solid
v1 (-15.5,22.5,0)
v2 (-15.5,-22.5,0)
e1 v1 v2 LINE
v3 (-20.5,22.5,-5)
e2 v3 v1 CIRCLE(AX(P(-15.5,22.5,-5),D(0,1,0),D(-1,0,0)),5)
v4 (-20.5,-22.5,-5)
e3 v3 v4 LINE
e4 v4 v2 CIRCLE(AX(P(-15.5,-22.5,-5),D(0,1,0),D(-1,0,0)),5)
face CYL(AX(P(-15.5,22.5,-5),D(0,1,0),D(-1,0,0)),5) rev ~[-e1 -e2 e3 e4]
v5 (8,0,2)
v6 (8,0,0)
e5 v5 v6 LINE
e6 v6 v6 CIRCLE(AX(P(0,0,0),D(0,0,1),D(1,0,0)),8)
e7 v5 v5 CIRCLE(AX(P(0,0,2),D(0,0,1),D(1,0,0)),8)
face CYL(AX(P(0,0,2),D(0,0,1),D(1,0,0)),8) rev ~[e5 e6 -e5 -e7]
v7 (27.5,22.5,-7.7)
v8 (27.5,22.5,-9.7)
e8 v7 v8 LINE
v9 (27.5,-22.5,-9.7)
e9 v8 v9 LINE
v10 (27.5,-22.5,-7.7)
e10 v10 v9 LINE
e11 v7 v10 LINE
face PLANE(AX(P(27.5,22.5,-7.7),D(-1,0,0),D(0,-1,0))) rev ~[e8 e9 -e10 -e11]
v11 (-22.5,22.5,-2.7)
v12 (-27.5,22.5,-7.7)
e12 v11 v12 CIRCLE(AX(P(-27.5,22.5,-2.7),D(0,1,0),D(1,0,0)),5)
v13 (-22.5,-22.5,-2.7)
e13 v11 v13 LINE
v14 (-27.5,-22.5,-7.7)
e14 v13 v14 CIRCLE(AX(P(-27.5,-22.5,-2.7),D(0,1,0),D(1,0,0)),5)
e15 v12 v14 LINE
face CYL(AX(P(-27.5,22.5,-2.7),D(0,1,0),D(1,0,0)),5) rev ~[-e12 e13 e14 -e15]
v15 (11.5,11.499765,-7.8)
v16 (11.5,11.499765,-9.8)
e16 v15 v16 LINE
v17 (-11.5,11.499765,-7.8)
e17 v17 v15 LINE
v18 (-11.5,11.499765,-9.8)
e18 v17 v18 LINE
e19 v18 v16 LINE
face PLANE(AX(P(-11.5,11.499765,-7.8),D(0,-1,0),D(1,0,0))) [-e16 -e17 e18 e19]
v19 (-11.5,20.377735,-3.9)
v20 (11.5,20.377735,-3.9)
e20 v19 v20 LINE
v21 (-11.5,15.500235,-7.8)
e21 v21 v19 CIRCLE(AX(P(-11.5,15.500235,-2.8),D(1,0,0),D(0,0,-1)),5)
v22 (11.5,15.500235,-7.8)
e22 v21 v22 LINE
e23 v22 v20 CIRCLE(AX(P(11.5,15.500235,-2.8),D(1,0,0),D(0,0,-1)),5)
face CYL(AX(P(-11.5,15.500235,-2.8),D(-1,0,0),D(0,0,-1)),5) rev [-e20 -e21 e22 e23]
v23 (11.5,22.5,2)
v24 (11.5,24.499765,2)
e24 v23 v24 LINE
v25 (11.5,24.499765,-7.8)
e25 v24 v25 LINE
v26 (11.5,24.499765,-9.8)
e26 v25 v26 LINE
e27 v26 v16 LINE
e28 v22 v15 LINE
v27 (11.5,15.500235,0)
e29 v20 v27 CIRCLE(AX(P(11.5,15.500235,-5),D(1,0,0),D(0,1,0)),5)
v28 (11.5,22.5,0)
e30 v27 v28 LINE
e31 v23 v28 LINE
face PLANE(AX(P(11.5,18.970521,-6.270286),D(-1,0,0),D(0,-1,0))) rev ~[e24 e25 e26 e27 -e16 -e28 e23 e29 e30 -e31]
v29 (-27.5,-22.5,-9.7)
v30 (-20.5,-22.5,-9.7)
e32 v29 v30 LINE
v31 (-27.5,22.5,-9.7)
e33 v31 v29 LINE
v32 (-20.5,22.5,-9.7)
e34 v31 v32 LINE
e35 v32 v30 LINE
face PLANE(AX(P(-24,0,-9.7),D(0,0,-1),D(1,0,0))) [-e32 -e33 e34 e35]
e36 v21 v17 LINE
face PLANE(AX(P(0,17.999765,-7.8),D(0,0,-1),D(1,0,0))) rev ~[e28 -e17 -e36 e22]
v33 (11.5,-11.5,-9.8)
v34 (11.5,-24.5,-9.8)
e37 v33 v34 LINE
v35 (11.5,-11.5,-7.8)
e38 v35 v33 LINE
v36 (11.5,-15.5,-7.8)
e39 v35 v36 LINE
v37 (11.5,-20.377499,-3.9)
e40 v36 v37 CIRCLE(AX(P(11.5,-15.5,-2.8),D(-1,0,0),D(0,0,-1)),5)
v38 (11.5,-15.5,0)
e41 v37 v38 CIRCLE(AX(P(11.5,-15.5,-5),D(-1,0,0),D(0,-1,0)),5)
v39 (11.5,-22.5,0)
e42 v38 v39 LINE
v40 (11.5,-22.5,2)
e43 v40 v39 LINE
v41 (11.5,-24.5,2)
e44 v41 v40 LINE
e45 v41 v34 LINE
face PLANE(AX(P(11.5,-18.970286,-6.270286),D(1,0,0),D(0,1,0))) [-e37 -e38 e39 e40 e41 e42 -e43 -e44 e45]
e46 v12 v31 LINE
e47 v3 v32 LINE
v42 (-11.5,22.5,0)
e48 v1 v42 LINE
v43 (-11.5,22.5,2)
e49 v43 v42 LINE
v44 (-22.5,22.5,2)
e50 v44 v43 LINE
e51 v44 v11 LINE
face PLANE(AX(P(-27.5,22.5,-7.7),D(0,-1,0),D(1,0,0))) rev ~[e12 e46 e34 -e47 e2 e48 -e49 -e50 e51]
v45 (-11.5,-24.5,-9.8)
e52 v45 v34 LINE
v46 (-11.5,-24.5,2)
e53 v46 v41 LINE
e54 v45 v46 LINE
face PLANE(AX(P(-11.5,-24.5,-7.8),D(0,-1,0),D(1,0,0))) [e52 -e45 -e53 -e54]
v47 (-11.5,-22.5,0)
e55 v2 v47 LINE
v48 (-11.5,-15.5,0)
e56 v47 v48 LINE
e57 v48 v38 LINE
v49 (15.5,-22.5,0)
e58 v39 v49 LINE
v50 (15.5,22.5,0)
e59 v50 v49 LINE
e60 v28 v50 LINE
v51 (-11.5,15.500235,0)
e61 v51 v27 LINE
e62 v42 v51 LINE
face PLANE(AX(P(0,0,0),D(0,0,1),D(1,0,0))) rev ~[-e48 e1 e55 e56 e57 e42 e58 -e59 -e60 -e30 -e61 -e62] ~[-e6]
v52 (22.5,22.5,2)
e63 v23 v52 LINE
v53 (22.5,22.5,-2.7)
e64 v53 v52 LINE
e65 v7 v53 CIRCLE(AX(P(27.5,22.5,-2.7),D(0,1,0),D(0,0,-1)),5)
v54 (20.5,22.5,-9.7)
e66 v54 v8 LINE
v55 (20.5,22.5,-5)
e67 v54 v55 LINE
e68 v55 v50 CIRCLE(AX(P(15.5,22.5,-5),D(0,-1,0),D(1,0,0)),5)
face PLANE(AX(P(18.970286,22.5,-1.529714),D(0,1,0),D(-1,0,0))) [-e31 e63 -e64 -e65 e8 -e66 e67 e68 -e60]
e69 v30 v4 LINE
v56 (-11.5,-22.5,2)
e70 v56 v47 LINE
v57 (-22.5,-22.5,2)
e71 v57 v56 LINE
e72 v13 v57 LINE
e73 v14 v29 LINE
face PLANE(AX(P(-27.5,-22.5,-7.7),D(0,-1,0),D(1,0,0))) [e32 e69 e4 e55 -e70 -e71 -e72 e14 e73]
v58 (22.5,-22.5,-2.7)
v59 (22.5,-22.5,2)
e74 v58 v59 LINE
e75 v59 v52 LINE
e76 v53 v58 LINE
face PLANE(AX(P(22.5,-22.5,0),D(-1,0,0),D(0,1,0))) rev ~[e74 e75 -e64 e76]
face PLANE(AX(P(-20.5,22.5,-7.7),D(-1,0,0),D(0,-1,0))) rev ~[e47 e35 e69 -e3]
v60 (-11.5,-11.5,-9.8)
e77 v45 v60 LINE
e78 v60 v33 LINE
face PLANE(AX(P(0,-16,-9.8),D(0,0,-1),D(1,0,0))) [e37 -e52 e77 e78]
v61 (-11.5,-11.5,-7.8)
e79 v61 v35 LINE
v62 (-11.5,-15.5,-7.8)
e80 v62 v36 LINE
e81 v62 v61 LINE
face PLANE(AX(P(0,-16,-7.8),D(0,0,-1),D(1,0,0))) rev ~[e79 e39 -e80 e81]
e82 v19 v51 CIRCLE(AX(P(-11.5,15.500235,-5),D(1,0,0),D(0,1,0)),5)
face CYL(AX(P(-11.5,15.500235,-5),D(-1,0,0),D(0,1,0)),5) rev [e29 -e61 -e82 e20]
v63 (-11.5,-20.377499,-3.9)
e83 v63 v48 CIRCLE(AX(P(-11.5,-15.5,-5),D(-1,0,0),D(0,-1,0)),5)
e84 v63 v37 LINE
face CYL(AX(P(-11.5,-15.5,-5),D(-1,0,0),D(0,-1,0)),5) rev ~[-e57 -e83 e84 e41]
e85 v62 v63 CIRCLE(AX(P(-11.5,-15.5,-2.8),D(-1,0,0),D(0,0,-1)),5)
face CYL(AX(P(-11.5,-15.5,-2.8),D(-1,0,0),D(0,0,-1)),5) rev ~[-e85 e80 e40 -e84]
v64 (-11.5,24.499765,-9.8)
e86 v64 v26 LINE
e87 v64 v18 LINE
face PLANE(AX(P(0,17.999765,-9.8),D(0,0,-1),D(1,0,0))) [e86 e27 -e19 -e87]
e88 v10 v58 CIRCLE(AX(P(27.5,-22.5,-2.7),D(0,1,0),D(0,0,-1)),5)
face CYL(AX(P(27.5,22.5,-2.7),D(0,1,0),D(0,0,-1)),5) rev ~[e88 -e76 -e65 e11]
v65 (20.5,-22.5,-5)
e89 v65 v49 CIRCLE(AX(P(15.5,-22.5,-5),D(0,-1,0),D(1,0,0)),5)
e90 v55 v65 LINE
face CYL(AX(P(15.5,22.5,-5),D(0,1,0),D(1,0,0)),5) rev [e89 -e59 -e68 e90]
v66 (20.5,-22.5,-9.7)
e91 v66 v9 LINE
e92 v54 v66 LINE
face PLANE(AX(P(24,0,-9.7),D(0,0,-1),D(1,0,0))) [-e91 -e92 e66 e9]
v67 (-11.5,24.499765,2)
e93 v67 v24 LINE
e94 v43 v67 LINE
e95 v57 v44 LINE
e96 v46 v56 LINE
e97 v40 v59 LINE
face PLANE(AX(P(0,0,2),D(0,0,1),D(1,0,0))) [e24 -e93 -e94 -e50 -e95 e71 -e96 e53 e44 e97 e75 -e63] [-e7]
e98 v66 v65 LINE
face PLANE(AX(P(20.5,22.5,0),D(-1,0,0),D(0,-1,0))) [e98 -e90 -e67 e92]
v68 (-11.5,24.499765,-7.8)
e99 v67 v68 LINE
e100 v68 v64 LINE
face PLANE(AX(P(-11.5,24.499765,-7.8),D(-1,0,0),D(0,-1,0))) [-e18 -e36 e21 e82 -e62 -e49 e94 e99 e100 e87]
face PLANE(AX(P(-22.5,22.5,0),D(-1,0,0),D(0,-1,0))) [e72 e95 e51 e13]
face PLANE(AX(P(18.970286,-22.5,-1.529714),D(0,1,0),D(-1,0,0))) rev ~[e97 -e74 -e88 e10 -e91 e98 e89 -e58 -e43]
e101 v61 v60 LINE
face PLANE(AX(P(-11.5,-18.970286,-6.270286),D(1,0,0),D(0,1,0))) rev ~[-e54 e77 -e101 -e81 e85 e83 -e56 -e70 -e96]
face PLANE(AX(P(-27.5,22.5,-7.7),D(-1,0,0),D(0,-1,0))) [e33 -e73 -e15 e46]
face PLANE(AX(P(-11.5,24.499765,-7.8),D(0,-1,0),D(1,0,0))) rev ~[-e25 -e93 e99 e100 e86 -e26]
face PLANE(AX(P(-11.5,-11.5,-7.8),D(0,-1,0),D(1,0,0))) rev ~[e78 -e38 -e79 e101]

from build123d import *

# Parameters (mm, degrees)
F0_W         = 45
F0_H         = 45
F1_DEPTH     = 2
F2_R         = 8
F3_DEPTH     = 25
F4_W         = 23
F4_H         = 3.9995294809
F4_H_2       = 4
F5_DEPTH     = 9.8
F6_W         = 23
F6_H         = 9
F6_H_2       = 4
F7_DEPTH     = 2
F8_W         = 23
F8_H         = 13
F9_DEPTH     = 2
F10_W        = 2
F10_H        = 45
F11_DEPTH    = 7.7
F12_W        = 7
F12_H        = 45
F13_W        = 7
F13_H        = 45
F14_DEPTH    = 2
F15_T1_DEPTH = 23
F15_T3_DEPTH = 45


# Not quite as in the source:
# - a fillet or chamfer that OpenCascade refuses, or shapes differently, is made with other operations: its cross-section is extruded or revolved along the edge and cut away or added


with BuildPart() as f1:
    # F0 (on Top) → F1 (new body)
    with BuildSketch(Plane.XY):
        Rectangle(F0_W, F0_H)
    extrude(amount=F1_DEPTH)

    # F2 (on face) → F3 (cut)
    with BuildSketch(Plane.XY.offset(2)):
        Circle(F2_R)
    extrude(amount=-F3_DEPTH, mode=Mode.SUBTRACT)

    # F4 (on face) → F5 (join)
    with BuildSketch(Plane.XY.offset(2)):
        with Locations((0, 22.5)):
            Rectangle(F4_W, F4_H)
        with Locations((0, -22.5)):
            Rectangle(F4_W, F4_H_2)
    extrude(amount=-F5_DEPTH)

    # F6 (on face) → F7 (join)
    with BuildSketch(Plane(origin=(0, 0, -7.8), x_dir=(1, 0, 0), z_dir=(0, 0, -1))):
        with Locations((0, 16)):
            Rectangle(F6_W, F6_H)
        with Locations((0, 22.5)):
            Rectangle(F6_W, F6_H_2)
    extrude(amount=F7_DEPTH)

    # F8 (on face) → F9 (join)
    with BuildSketch(Plane(origin=(0, 0, -7.8), x_dir=(1, 0, 0), z_dir=(0, 0, -1))):
        with Locations((0, -17.9997647405)):
            Rectangle(F8_W, F8_H)
    extrude(amount=F9_DEPTH)

    # F10 (on face) → F11 (join)
    with BuildSketch(Plane(origin=(0, 0, 0), x_dir=(1, 0, 0), z_dir=(0, 0, -1))):
        with Locations((-21.5, 0)):
            Rectangle(F10_W, F10_H)
        with Locations((21.5, 0)):
            Rectangle(F10_W, F10_H)
    extrude(amount=F11_DEPTH)

    # F12 (on face) + F13 (on face) → F14 (join)
    with BuildSketch(Plane(origin=(0, 0, -7.7), x_dir=(1, 0, 0), z_dir=(0, 0, -1))):
        with Locations((-24, 0)):
            Rectangle(F12_W, F12_H)
    with BuildSketch(Plane(origin=(0, 0, -7.7), x_dir=(1, 0, 0), z_dir=(0, 0, -1))):
        with Locations((24, 0)):
            Rectangle(F13_W, F13_H)
    extrude(amount=F14_DEPTH)

    # F15: fillet of radius 5 on 8 edges, made by hand

    # F15_s2 → F15_t1 (join)
    with BuildSketch(Plane.YZ.offset(-11.5)):
        with BuildLine():
            ThreePointArc((-15.5, -7.8), (-19.0355339059, -6.3355339059), (-20.5, -2.8))
            Line((-20.5, -2.8), (-20.5, -7.8))
            Line((-20.5, -7.8), (-15.5, -7.8))
        make_face()
        with BuildLine():
            ThreePointArc((15.5002352595, -7.8), (19.0357691655, -6.3355339059), (20.5002352595, -2.8))
            Line((20.5002352595, -2.8), (20.5002352595, -7.8))
            Line((20.5002352595, -7.8), (15.5002352595, -7.8))
        make_face()
        with BuildLine():
            ThreePointArc((20.5002352595, -5), (19.0357691655, -1.4644660941), (15.5002352595, 0))
            Line((15.5002352595, 0), (20.5002352595, 0))
            Line((20.5002352595, 0), (20.5002352595, -5))
        make_face()
        with BuildLine():
            ThreePointArc((-20.5, -5), (-19.0355339059, -1.4644660941), (-15.5, 0))
            Line((-15.5, 0), (-20.5, 0))
            Line((-20.5, 0), (-20.5, -5))
        make_face()
    extrude(amount=F15_T1_DEPTH)

    # F15_s4 → F15_t3 (join)
    with BuildSketch(Plane.XZ.offset(-22.5)):
        with BuildLine():
            ThreePointArc((20.5, -5), (19.0355339059, -1.4644660941), (15.5, 0))
            Line((15.5, 0), (20.5, 0))
            Line((20.5, 0), (20.5, -5))
        make_face()
        with BuildLine():
            ThreePointArc((-20.5, -5), (-19.0355339059, -1.4644660941), (-15.5, 0))
            Line((-15.5, 0), (-20.5, 0))
            Line((-20.5, 0), (-20.5, -5))
        make_face()
        with BuildLine():
            ThreePointArc((-22.5, -2.7), (-23.9644660941, -6.2355339059), (-27.5, -7.7))
            Line((-27.5, -7.7), (-22.5, -7.7))
            Line((-22.5, -7.7), (-22.5, -2.7))
        make_face()
        with BuildLine():
            ThreePointArc((27.5, -7.7), (23.9644660941, -6.2355339059), (22.5, -2.7))
            Line((22.5, -2.7), (22.5, -7.7))
            Line((22.5, -7.7), (27.5, -7.7))
        make_face()
    extrude(amount=F15_T3_DEPTH)


solid = f1.part
